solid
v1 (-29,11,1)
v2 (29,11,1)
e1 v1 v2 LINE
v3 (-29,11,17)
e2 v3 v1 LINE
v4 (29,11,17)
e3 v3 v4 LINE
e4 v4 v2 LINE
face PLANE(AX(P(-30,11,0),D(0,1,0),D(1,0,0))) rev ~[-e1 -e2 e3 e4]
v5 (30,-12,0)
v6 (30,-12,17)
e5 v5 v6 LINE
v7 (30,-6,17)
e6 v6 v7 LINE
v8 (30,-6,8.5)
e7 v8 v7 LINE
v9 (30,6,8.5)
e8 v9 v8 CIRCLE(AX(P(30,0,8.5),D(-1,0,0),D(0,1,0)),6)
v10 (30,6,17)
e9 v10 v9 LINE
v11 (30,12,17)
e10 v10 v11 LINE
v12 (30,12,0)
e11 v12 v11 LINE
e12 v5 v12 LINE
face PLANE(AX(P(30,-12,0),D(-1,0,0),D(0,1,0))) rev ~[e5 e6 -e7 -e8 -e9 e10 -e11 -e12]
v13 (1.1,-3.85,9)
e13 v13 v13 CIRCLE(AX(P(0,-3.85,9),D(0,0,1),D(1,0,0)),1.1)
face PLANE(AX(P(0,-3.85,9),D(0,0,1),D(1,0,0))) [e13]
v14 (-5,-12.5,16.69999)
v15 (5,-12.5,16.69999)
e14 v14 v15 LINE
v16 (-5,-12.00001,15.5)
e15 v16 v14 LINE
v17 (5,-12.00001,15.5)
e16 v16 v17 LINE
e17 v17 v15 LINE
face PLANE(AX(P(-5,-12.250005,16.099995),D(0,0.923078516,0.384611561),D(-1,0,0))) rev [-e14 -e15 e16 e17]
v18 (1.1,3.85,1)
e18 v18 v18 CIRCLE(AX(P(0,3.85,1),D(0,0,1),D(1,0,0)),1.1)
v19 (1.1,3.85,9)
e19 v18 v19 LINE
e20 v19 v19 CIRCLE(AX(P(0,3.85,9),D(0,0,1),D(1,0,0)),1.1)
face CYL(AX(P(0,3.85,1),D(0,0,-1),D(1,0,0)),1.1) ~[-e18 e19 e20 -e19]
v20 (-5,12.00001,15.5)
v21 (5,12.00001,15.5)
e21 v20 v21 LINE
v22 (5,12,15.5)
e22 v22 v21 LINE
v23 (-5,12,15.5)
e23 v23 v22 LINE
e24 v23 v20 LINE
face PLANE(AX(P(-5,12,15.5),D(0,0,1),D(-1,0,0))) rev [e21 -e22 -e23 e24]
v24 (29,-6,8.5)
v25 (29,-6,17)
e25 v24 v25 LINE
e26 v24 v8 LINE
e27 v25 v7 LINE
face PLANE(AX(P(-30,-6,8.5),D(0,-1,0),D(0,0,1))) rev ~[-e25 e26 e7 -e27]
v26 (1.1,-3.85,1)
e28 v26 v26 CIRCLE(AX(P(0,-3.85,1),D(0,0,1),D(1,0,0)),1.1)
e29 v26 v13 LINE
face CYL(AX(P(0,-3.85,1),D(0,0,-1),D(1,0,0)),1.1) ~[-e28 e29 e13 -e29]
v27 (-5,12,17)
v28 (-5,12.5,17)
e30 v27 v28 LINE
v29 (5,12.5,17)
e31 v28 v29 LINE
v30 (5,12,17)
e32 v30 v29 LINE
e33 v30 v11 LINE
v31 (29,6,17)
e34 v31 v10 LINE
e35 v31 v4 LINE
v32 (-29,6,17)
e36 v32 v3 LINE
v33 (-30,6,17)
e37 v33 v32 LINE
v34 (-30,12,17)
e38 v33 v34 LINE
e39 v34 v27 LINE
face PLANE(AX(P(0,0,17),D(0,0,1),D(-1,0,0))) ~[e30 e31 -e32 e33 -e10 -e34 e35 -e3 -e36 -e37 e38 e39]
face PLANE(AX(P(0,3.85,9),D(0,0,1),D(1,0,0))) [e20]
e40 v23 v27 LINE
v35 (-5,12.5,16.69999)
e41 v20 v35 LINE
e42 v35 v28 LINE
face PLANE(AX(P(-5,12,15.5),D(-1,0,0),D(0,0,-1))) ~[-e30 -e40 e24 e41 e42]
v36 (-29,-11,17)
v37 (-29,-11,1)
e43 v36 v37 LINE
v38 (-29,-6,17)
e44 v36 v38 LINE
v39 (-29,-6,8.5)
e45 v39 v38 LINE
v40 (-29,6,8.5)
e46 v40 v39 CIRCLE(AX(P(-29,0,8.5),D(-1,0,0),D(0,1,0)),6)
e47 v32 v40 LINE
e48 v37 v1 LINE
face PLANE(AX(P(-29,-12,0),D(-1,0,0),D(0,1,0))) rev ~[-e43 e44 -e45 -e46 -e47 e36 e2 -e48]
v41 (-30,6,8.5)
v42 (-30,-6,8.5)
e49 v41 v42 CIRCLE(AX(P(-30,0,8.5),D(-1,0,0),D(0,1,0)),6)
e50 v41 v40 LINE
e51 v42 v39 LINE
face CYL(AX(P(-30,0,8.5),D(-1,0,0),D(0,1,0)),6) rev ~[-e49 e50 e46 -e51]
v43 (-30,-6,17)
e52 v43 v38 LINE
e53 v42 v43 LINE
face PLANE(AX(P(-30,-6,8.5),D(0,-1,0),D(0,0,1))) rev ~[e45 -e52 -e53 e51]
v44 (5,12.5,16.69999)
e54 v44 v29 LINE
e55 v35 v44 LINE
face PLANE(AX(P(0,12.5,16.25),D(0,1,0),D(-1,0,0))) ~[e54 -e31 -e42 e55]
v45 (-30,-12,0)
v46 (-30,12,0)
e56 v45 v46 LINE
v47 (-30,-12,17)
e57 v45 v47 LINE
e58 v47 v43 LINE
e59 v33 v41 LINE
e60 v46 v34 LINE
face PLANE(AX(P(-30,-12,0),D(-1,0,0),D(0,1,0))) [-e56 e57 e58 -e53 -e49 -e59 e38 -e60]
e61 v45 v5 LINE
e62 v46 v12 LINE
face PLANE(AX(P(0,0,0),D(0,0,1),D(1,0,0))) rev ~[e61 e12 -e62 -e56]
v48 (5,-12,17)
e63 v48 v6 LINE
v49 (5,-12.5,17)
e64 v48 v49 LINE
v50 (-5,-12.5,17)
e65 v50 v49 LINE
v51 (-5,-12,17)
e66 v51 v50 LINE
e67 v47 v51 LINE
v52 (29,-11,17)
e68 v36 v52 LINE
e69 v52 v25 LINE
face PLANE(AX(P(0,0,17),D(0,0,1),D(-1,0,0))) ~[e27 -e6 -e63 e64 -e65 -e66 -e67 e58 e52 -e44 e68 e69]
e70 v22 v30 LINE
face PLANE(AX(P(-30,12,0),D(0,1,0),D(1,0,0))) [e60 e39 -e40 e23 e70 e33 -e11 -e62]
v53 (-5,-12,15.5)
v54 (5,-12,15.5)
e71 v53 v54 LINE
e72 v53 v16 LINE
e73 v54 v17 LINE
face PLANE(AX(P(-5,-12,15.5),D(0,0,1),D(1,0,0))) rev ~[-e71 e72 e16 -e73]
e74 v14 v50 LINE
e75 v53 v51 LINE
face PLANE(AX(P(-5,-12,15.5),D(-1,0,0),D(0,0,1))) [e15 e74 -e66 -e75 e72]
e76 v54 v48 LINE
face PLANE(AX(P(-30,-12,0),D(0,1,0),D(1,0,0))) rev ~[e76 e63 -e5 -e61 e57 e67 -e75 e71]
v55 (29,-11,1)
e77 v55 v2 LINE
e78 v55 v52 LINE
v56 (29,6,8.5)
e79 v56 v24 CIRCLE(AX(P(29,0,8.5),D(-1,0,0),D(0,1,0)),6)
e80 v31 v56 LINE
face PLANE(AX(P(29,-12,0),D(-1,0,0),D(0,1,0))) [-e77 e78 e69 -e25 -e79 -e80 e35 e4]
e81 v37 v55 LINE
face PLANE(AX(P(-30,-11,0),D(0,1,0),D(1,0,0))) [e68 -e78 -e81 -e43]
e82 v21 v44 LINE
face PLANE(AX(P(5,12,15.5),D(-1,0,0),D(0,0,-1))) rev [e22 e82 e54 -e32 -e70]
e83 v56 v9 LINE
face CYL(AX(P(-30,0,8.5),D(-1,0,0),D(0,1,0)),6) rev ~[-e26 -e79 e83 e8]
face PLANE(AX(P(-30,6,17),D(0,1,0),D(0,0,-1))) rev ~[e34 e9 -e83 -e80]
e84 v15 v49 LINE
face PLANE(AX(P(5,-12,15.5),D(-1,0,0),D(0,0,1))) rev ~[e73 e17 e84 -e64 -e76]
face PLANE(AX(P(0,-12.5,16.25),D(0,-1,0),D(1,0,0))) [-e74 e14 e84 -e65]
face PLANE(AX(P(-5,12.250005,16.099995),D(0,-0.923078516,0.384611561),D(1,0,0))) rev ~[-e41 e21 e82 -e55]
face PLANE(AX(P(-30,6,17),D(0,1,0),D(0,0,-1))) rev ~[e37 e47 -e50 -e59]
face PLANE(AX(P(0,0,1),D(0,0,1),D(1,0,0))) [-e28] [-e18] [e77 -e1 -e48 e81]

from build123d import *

# Parameters (mm, degrees)
F0_W      = 60
F0_H      = 24
F1_DEPTH  = 17
F2_T      = -1
F3_W      = 10
F3_H      = 1.5
F4_DEPTH  = 0.5
F5_SIZE2  = 1.19999
F5_SIZE   = 0.49999
F8_DEPTH  = 60.001
F9_R      = 1.1
F10_DEPTH = 8


# Not quite as in the source:
# - a fillet or chamfer is up to 0.001 mm smaller than in the source, because OpenCascade refuses the exact size


with BuildPart() as f1:
    # F0 (on Top) → F1 (new body)
    with BuildSketch(Plane.XY):
        Rectangle(F0_W, F0_H)
    extrude(amount=F1_DEPTH)

    # F2
    f2_openings = [f1.faces().sort_by_distance(p)[0] for p in [
        (0, 0, 17),
    ]]
    offset(amount=F2_T, openings=f2_openings)

    # F3 (on face) → F4 (join)
    with BuildSketch(Plane.XZ.offset(12)):
        with Locations((0, 16.25)):
            Rectangle(F3_W, F3_H)
    extrude(amount=F4_DEPTH)

    # F5 (size 0.5 and 1.2 in the source; OpenCascade refuses exactly that, so slightly less here)
    f5_edges = [f1.edges().sort_by_distance(p)[0] for p in [
        (0, -12.5, 15.5),
    ]]
    f5_side = f1.faces().sort_by_distance((0, -12.25, 15.5))[0]
    chamfer(f5_edges, length=F5_SIZE, length2=F5_SIZE2, reference=f5_side)

    # F6: F1 across plane


with BuildPart() as f1_1:
    add(f1.part)
    add(f1.part.mirror(Plane.XZ))

    # F7 (on face) → F8 (cut, through all)
    with BuildSketch(Plane(origin=(-30, 0, 0), x_dir=(0, -1, 0), z_dir=(-1, 0, 0))):
        with BuildLine():
            Line((-6, 17), (-6, 8.5))
            ThreePointArc((-6, 8.5), (0, 2.5), (6, 8.5))
            Line((6, 8.5), (6, 17))
            Line((6, 17), (-6, 17))
        make_face()
    extrude(amount=-F8_DEPTH, mode=Mode.SUBTRACT)

    # F9 (on face) → F10 (join)
    with BuildSketch(Plane.XY.offset(1)):
        with Locations((0, 3.85)):
            Circle(F9_R)
        with Locations((0, -3.85)):
            Circle(F9_R)
    extrude(amount=F10_DEPTH)


solid = f1_1.part
